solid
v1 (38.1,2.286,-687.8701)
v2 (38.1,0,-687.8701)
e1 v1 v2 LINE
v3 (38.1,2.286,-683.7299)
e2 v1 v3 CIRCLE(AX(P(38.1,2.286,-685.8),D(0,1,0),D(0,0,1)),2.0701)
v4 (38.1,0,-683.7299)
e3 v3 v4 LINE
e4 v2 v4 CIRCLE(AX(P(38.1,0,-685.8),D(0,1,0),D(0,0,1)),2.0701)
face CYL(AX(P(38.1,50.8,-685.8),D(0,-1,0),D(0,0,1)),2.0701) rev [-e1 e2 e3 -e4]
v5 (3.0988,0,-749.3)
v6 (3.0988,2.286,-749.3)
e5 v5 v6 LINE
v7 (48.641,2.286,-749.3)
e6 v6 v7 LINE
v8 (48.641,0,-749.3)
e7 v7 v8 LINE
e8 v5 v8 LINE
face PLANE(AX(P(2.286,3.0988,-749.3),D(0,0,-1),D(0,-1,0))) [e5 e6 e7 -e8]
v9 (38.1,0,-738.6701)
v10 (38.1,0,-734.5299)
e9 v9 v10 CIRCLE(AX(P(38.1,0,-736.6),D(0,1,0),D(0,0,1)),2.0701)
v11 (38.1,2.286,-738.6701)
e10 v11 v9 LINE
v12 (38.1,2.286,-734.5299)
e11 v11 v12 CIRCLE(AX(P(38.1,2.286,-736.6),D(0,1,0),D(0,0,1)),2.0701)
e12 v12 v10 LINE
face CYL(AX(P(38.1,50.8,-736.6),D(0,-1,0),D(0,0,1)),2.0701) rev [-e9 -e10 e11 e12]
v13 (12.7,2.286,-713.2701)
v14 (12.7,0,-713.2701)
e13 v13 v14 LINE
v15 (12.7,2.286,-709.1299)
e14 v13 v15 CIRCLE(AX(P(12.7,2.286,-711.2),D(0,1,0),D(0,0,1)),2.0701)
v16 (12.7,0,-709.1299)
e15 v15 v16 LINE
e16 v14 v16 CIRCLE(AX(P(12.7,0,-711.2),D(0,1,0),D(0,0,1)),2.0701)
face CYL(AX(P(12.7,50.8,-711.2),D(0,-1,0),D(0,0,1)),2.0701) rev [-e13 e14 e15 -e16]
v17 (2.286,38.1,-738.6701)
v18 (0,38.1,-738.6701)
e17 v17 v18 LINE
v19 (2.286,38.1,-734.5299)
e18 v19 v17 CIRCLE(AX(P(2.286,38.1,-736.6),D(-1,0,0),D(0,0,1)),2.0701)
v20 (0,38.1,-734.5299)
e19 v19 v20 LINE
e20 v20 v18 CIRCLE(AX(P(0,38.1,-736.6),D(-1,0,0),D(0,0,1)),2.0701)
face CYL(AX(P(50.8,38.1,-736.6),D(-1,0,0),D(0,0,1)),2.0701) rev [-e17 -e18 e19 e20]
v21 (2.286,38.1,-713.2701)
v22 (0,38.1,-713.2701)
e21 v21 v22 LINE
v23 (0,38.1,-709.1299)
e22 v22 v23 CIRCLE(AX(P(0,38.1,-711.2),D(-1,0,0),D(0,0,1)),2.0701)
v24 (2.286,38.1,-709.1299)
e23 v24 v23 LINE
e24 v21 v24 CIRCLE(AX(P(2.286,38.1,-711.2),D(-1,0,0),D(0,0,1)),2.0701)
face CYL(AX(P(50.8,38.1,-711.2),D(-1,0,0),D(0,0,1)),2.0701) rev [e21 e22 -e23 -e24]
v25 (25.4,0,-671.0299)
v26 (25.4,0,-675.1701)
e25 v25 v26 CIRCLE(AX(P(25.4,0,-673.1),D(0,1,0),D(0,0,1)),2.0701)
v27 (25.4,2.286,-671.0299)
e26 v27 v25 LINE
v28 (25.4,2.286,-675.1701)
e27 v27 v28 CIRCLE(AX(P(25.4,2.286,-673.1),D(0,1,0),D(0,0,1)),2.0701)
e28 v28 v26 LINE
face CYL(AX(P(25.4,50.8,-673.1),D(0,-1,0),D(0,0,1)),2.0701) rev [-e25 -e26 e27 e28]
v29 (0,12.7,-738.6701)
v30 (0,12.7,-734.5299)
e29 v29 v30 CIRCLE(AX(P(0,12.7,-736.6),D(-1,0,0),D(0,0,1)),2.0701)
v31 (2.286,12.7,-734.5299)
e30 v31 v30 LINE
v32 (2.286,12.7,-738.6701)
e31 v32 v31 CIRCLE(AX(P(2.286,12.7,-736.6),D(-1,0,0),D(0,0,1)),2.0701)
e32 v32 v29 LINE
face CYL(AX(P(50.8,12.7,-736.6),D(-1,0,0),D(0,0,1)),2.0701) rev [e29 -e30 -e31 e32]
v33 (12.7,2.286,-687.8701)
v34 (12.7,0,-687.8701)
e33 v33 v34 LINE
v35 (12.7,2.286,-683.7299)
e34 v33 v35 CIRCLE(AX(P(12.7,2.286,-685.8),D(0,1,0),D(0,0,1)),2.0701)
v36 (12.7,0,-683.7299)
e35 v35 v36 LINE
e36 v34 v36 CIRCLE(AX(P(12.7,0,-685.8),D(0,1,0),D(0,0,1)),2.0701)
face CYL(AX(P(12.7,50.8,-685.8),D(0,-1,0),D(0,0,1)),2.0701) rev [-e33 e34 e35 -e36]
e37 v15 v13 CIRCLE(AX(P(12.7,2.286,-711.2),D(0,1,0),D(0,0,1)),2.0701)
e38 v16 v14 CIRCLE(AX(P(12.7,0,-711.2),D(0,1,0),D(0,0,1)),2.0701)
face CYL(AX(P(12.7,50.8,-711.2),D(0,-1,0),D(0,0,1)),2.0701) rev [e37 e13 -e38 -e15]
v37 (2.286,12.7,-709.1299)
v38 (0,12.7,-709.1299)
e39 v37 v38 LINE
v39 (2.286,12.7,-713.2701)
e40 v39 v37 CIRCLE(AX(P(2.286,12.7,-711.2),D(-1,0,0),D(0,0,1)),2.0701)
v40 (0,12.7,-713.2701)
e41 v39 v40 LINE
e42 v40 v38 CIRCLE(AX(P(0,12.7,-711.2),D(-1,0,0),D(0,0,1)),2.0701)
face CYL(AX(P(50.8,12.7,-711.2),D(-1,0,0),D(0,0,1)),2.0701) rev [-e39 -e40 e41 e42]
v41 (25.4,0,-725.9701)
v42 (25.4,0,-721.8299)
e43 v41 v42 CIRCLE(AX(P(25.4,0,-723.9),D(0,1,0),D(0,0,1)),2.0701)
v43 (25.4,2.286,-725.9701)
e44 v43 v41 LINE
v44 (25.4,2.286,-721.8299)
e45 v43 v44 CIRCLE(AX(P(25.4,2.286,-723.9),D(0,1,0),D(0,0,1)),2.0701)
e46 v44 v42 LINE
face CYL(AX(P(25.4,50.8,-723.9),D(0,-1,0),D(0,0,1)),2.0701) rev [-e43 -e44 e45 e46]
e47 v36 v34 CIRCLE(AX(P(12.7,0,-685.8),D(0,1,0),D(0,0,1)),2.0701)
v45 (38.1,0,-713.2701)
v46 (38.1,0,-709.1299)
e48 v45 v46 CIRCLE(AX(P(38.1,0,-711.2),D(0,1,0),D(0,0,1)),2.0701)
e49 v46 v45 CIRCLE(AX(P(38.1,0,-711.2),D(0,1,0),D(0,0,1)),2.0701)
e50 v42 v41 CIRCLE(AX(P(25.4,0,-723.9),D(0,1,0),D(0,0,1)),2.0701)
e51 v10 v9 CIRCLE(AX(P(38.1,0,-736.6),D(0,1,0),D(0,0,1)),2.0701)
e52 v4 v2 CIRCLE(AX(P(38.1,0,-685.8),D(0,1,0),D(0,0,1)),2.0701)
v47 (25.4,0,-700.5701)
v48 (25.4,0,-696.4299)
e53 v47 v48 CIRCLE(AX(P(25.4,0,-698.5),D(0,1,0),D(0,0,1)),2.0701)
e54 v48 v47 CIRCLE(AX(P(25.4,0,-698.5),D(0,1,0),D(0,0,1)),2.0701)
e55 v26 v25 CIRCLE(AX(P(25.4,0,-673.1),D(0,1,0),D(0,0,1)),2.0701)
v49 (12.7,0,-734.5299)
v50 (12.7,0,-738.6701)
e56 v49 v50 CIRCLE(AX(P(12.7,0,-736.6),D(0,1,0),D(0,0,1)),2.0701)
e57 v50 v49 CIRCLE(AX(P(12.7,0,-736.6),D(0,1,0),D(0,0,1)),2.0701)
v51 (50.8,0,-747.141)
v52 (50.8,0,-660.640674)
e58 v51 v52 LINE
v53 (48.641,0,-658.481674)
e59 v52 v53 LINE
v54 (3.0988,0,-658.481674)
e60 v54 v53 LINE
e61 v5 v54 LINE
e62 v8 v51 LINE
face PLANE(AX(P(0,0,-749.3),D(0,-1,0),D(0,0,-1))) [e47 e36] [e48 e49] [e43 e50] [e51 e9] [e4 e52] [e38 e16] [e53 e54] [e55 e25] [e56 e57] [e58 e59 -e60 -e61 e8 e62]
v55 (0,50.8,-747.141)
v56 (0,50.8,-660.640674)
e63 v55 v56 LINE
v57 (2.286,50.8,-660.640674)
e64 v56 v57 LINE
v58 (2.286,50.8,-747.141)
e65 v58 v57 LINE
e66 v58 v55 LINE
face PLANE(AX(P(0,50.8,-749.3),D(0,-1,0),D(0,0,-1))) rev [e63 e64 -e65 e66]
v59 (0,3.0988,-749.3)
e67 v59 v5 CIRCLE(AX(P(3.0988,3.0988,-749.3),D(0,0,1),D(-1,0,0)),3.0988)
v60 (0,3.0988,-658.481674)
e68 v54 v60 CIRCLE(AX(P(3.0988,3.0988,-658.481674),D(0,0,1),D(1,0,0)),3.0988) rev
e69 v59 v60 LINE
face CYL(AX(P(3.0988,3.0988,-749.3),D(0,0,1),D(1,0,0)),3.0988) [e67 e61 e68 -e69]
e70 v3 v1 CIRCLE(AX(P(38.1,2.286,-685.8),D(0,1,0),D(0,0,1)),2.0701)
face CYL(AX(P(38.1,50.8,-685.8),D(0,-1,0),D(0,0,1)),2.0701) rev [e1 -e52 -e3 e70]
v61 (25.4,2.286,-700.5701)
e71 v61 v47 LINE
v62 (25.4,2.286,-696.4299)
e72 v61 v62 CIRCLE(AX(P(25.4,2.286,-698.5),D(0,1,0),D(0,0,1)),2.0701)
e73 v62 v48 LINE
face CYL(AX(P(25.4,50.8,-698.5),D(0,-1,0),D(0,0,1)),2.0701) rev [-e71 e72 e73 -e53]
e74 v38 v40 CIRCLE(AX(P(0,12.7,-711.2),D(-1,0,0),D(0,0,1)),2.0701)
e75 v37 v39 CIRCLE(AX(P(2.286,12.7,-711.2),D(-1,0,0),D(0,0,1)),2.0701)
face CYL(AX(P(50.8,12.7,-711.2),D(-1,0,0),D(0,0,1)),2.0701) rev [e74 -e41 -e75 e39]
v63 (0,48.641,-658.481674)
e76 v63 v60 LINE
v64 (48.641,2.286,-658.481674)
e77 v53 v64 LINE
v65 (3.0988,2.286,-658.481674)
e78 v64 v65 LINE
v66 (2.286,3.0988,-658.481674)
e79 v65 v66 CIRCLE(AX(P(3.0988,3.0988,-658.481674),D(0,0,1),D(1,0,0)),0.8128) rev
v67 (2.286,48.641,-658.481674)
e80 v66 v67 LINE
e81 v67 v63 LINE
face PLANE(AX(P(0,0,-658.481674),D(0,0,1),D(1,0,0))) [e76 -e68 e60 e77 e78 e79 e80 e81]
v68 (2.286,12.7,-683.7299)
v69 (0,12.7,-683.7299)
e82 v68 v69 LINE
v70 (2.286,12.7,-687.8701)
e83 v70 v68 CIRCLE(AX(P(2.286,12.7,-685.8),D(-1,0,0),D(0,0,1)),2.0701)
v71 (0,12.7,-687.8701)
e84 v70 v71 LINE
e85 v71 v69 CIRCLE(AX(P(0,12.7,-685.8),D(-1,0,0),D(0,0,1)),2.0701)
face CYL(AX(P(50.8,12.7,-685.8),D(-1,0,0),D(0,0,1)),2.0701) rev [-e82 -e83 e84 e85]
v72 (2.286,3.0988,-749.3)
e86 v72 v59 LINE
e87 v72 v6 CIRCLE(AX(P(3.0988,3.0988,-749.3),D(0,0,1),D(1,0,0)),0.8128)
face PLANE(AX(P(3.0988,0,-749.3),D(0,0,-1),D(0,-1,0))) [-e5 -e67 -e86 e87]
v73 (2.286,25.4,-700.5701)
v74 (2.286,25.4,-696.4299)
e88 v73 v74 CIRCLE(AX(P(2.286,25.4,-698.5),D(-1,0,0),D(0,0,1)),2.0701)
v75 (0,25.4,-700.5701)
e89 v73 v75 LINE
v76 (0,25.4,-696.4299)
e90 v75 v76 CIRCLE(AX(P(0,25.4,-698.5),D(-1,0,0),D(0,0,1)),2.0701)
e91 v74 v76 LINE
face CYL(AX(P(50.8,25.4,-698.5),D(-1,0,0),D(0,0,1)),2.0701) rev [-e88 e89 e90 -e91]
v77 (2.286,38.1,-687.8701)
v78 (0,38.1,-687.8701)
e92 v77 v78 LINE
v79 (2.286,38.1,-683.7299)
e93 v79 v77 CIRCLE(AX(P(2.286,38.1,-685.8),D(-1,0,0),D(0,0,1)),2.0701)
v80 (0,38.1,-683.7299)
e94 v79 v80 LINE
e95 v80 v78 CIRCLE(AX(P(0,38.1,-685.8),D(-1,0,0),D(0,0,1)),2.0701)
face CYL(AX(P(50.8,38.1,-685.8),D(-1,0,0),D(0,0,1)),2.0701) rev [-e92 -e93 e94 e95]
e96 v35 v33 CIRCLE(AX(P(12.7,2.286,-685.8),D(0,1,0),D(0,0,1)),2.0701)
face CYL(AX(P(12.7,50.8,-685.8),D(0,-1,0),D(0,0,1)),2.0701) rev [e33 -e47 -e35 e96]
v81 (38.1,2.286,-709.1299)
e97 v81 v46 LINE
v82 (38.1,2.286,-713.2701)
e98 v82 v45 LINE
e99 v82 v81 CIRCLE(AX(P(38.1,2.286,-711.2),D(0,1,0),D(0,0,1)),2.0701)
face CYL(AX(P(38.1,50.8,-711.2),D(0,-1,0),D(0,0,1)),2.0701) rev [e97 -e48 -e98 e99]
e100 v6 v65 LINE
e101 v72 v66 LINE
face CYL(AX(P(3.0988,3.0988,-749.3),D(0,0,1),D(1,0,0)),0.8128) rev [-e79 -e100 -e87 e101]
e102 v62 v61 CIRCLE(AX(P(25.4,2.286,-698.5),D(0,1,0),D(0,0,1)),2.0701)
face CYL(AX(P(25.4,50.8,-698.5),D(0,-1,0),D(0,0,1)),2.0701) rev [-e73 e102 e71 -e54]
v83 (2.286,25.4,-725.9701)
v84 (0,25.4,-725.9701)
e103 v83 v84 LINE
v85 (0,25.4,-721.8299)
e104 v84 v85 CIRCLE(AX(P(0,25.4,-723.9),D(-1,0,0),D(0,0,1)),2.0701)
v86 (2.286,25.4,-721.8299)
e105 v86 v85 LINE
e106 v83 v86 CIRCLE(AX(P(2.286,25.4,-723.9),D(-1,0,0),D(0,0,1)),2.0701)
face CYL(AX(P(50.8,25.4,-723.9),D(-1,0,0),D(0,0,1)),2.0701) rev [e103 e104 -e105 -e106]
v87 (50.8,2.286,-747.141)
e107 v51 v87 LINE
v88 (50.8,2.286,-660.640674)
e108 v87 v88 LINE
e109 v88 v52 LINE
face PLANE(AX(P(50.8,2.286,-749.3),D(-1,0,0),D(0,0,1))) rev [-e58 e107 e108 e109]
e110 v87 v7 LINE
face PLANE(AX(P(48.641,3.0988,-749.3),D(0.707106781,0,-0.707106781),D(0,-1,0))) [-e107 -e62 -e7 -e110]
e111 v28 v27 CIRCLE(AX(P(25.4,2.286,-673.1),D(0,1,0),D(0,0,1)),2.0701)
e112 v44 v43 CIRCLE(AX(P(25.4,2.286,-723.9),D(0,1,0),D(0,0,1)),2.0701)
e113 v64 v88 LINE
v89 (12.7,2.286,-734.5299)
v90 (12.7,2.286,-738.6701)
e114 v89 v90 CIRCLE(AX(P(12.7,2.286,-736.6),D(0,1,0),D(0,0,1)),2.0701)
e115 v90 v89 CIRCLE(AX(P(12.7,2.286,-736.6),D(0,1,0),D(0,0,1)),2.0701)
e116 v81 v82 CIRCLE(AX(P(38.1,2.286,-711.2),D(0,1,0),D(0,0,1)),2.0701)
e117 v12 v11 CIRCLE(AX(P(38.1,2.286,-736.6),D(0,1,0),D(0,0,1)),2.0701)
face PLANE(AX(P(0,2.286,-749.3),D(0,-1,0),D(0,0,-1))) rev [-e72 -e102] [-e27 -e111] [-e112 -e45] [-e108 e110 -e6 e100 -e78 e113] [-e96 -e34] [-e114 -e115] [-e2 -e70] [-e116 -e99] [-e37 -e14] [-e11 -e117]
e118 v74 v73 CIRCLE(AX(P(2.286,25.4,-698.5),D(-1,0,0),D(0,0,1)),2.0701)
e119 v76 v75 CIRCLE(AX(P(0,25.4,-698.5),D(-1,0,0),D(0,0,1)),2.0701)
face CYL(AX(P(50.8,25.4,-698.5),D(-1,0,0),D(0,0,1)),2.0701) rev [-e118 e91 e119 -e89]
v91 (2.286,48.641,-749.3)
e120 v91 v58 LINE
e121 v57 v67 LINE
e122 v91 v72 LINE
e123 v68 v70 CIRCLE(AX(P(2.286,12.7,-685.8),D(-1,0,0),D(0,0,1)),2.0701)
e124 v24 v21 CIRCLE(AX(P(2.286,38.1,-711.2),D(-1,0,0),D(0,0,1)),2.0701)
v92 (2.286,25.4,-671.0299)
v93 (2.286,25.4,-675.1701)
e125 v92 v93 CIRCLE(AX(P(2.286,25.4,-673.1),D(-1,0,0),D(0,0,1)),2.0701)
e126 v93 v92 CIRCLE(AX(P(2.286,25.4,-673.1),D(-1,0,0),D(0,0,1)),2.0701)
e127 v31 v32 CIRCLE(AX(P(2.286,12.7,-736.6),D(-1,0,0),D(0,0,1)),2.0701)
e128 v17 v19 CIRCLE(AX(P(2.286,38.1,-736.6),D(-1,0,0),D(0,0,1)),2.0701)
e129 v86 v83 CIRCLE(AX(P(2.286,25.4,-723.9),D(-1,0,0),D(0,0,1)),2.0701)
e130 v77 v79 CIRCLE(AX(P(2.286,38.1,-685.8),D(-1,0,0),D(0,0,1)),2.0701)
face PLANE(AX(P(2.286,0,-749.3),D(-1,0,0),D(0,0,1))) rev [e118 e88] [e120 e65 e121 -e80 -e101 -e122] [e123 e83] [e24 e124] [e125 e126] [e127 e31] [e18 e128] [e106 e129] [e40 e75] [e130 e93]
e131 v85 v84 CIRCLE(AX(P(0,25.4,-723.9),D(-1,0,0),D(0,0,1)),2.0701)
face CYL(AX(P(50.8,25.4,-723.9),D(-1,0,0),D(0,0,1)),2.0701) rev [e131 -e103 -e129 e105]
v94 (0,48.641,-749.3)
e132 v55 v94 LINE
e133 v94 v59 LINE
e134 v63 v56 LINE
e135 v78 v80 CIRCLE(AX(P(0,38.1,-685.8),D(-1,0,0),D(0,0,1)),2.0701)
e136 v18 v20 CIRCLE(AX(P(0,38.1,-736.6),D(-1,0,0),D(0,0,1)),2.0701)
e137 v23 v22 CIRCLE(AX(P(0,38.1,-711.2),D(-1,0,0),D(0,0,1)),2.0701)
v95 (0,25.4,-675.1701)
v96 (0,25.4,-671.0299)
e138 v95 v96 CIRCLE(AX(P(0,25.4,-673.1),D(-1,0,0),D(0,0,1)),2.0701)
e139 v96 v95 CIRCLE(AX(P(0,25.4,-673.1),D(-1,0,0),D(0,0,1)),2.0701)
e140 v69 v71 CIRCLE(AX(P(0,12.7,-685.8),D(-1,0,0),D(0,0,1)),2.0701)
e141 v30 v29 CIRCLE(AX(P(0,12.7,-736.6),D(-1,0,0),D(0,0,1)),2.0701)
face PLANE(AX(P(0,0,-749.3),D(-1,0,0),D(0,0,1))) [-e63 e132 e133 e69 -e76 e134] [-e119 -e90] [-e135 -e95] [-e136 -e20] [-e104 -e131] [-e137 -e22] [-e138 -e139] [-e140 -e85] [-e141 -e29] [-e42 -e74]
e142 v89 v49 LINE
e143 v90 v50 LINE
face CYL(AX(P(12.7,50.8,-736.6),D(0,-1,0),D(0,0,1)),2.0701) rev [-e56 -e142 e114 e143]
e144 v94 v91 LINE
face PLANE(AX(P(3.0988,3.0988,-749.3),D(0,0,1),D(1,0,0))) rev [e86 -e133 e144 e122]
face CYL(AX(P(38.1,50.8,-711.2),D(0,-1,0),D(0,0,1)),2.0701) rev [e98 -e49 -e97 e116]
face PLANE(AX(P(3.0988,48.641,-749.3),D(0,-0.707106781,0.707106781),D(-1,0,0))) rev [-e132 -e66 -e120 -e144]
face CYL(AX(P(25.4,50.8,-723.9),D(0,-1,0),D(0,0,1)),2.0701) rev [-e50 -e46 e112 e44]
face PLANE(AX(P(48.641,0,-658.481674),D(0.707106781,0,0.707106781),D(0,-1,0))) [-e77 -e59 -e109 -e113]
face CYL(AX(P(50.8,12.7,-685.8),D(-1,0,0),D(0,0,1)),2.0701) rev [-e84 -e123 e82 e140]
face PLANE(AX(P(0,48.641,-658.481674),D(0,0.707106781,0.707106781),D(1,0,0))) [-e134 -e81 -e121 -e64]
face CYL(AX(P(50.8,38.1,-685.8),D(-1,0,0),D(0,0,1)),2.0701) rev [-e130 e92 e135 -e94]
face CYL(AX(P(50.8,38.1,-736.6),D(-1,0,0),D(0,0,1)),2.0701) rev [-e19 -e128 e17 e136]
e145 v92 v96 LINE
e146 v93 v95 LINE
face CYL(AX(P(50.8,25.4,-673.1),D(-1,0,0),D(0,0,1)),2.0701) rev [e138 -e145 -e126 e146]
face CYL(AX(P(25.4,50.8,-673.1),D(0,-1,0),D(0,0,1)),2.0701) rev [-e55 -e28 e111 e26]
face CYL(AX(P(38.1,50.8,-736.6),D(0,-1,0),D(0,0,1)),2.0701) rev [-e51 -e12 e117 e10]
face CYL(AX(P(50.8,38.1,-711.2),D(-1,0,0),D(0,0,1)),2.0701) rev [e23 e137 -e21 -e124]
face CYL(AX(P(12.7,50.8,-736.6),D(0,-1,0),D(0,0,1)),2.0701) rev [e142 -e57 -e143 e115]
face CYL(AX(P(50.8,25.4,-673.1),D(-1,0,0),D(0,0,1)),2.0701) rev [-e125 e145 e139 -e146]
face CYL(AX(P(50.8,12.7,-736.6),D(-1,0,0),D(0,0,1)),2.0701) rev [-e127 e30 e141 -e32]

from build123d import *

# Parameters (mm, degrees)
CUT_EXTRUDE1_START       = 14.7701
CUT_EXTRUDE1_OUTLINE_W   = 2.286
CUT_EXTRUDE1_OUTLINE_H   = 127
CUT_EXTRUDE1_DEPTH       = 8.5598
CUT_EXTRUDE1_START_2     = 27.4701
CUT_EXTRUDE1_2_OUTLINE_W = 2.286
CUT_EXTRUDE1_2_OUTLINE_H = 127
CUT_EXTRUDE1_2_DEPTH     = 8.5598
CUT_EXTRUDE1_START_3     = 40.1701
CUT_EXTRUDE1_3_OUTLINE_W = 2.286
CUT_EXTRUDE1_3_OUTLINE_H = 127
CUT_EXTRUDE1_3_DEPTH     = 8.4709
CUT_EXTRUDE1_START_4     = 2.286
CUT_EXTRUDE1_4_OUTLINE_W = 2.286
CUT_EXTRUDE1_4_OUTLINE_H = 127
CUT_EXTRUDE1_4_DEPTH     = 8.3439
CUT_EXTRUDE1_5_OUTLINE_R = 2.0701
CUT_EXTRUDE1_5_DEPTH     = 3.0988
CUT_EXTRUDE1_START_5     = 10.6299
CUT_EXTRUDE1_6_OUTLINE_W = 2.286
CUT_EXTRUDE1_6_OUTLINE_H = 127
CUT_EXTRUDE1_6_DEPTH     = 40.1701
CUT_EXTRUDE1_START_6     = -1
CUT_EXTRUDE1_7_OUTLINE_R = 2.0701
CUT_EXTRUDE1_7_DEPTH     = 3.286
CUT_EXTRUDE1_START_7     = -749.3
CUT_EXTRUDE1_8_DEPTH     = 127
CUT_EXTRUDE1_START_8     = 564.229492087
CUT_EXTRUDE1_9_OUTLINE_W = 3.286
CUT_EXTRUDE1_9_OUTLINE_H = 75
CUT_EXTRUDE1_9_DEPTH     = 2.770507913
CHAMFER1_SIZE            = 2.159
BOSS_EXTRUDE1_START      = -2.286
BOSS_EXTRUDE1_DEPTH      = 2.286
BOSS_EXTRUDE2_START      = -2.286
BOSS_EXTRUDE2_DEPTH      = 2.286
SKETCH4_W                = 50.8
SKETCH4_H                = 50.8
CUT_EXTRUDE2_DEPTH       = 36.181674144
BOSS_EXTRUDE3_DEPTH      = 2.286
BOSS_EXTRUDE4_START      = -2.286
BOSS_EXTRUDE4_DEPTH      = 2.286
CHAMFER2_SIZE            = 2.159


with BuildPart() as part:
    # Cut-Extrude1: read off the stored shape, not the designer's step
    # Cut-Extrude1 outline → Cut-Extrude1 (new body)
    with BuildSketch(Plane(origin=(0, 0, 0), x_dir=(1, 0, 0), z_dir=(0, 1, 0)).offset(CUT_EXTRUDE1_START)):
        with Locations((1.143, 685.8)):
            Rectangle(CUT_EXTRUDE1_OUTLINE_W, CUT_EXTRUDE1_OUTLINE_H)
    extrude(amount=CUT_EXTRUDE1_DEPTH)



with BuildPart() as body_2:
    # Cut-Extrude1 2 outline → Cut-Extrude1 2 (new body)
    with BuildSketch(Plane(origin=(0, 0, 0), x_dir=(1, 0, 0), z_dir=(0, 1, 0)).offset(CUT_EXTRUDE1_START_2)):
        with Locations((1.143, 685.8)):
            Rectangle(CUT_EXTRUDE1_2_OUTLINE_W, CUT_EXTRUDE1_2_OUTLINE_H)
    extrude(amount=CUT_EXTRUDE1_2_DEPTH)


with BuildPart() as body_3:
    # Cut-Extrude1 3 outline → Cut-Extrude1 3 (new body)
    with BuildSketch(Plane(origin=(0, 0, 0), x_dir=(1, 0, 0), z_dir=(0, 1, 0)).offset(CUT_EXTRUDE1_START_3)):
        with Locations((1.143, 685.8)):
            Rectangle(CUT_EXTRUDE1_3_OUTLINE_W, CUT_EXTRUDE1_3_OUTLINE_H)
    extrude(amount=CUT_EXTRUDE1_3_DEPTH)


with BuildPart() as body_4:
    # Cut-Extrude1 4 outline → Cut-Extrude1 4 (new body)
    with BuildSketch(Plane(origin=(0, 0, 0), x_dir=(1, 0, 0), z_dir=(0, 1, 0)).offset(CUT_EXTRUDE1_START_4)):
        with Locations((1.143, 685.8)):
            Rectangle(CUT_EXTRUDE1_4_OUTLINE_W, CUT_EXTRUDE1_4_OUTLINE_H)
    extrude(amount=CUT_EXTRUDE1_4_DEPTH)

    # Cut-Extrude1 5 outline → Cut-Extrude1 5 (add)
    with BuildSketch(Plane(origin=(0, 0, 0), x_dir=(1, 0, 0), z_dir=(0, 1, 0))):
        with BuildLine():
            ThreePointArc((23.3299, 622.3), (23.936218252, 623.763781748), (25.4, 624.3701))
            ThreePointArc((25.4, 624.3701), (26.863781748, 623.763781748), (27.4701, 622.3))
            Line((27.4701, 622.3), (50.8, 622.3))
            Line((50.8, 622.3), (50.8, 747.141))
            Line((50.8, 747.141), (48.641, 749.3))
            Line((48.641, 749.3), (0, 749.3))
            Line((0, 749.3), (0, 622.3))
            Line((0, 622.3), (23.3299, 622.3))
        make_face()
        with Locations((12.7, 635)):
            Circle(CUT_EXTRUDE1_5_OUTLINE_R, mode=Mode.SUBTRACT)
        with Locations((25.4, 647.7)):
            Circle(CUT_EXTRUDE1_5_OUTLINE_R, mode=Mode.SUBTRACT)
        with Locations((12.7, 660.4)):
            Circle(CUT_EXTRUDE1_5_OUTLINE_R, mode=Mode.SUBTRACT)
        with Locations((25.4, 673.1)):
            Circle(CUT_EXTRUDE1_5_OUTLINE_R, mode=Mode.SUBTRACT)
        with Locations((38.1, 635)):
            Circle(CUT_EXTRUDE1_5_OUTLINE_R, mode=Mode.SUBTRACT)
        with Locations((38.1, 660.4)):
            Circle(CUT_EXTRUDE1_5_OUTLINE_R, mode=Mode.SUBTRACT)
        with Locations((12.7, 685.8)):
            Circle(CUT_EXTRUDE1_5_OUTLINE_R, mode=Mode.SUBTRACT)
        with Locations((12.7, 711.2)):
            Circle(CUT_EXTRUDE1_5_OUTLINE_R, mode=Mode.SUBTRACT)
        with Locations((25.4, 698.5)):
            Circle(CUT_EXTRUDE1_5_OUTLINE_R, mode=Mode.SUBTRACT)
        with Locations((12.7, 736.6)):
            Circle(CUT_EXTRUDE1_5_OUTLINE_R, mode=Mode.SUBTRACT)
        with Locations((25.4, 723.9)):
            Circle(CUT_EXTRUDE1_5_OUTLINE_R, mode=Mode.SUBTRACT)
        with Locations((38.1, 685.8)):
            Circle(CUT_EXTRUDE1_5_OUTLINE_R, mode=Mode.SUBTRACT)
        with Locations((38.1, 711.2)):
            Circle(CUT_EXTRUDE1_5_OUTLINE_R, mode=Mode.SUBTRACT)
        with Locations((38.1, 736.6)):
            Circle(CUT_EXTRUDE1_5_OUTLINE_R, mode=Mode.SUBTRACT)
    extrude(amount=CUT_EXTRUDE1_5_DEPTH)


with BuildPart() as part_1:
    add(part.part)

    add(body_2.part)  # Cut-Extrude1 6 merges body 2

    add(body_3.part)  # Cut-Extrude1 6 merges body 3

    add(body_4.part)  # Cut-Extrude1 6 merges body 4
    # Cut-Extrude1 6 outline → Cut-Extrude1 6 (add)
    with BuildSketch(Plane(origin=(0, 0, 0), x_dir=(1, 0, 0), z_dir=(0, 1, 0)).offset(CUT_EXTRUDE1_START_5)):
        with Locations((1.143, 685.8)):
            Rectangle(CUT_EXTRUDE1_6_OUTLINE_W, CUT_EXTRUDE1_6_OUTLINE_H)
    extrude(amount=CUT_EXTRUDE1_6_DEPTH)

    # Cut-Extrude1 7 outline → Cut-Extrude1 7 (cut)
    with BuildSketch(Plane.YZ.offset(CUT_EXTRUDE1_START_6)):
        with BuildLine():
            ThreePointArc((23.3299, -622.3), (23.936218252, -623.763781748), (25.4, -624.3701))
            ThreePointArc((25.4, -624.3701), (26.863781748, -623.763781748), (27.4701, -622.3))
            Line((27.4701, -622.3), (23.3299, -622.3))
        make_face()
        with Locations((25.4, -723.9)):
            Circle(CUT_EXTRUDE1_7_OUTLINE_R)
        with Locations((25.4, -698.5)):
            Circle(CUT_EXTRUDE1_7_OUTLINE_R)
        with Locations((25.4, -673.1)):
            Circle(CUT_EXTRUDE1_7_OUTLINE_R)
        with Locations((25.4, -647.7)):
            Circle(CUT_EXTRUDE1_7_OUTLINE_R)
        with Locations((12.7, -736.6)):
            Circle(CUT_EXTRUDE1_7_OUTLINE_R)
        with Locations((12.7, -711.2)):
            Circle(CUT_EXTRUDE1_7_OUTLINE_R)
        with Locations((12.7, -685.8)):
            Circle(CUT_EXTRUDE1_7_OUTLINE_R)
        with Locations((12.7, -660.4)):
            Circle(CUT_EXTRUDE1_7_OUTLINE_R)
        with Locations((12.7, -635)):
            Circle(CUT_EXTRUDE1_7_OUTLINE_R)
        with Locations((38.1, -736.6)):
            Circle(CUT_EXTRUDE1_7_OUTLINE_R)
        with Locations((38.1, -711.2)):
            Circle(CUT_EXTRUDE1_7_OUTLINE_R)
        with Locations((38.1, -685.8)):
            Circle(CUT_EXTRUDE1_7_OUTLINE_R)
        with Locations((38.1, -660.4)):
            Circle(CUT_EXTRUDE1_7_OUTLINE_R)
        with Locations((38.1, -635)):
            Circle(CUT_EXTRUDE1_7_OUTLINE_R)
    extrude(amount=CUT_EXTRUDE1_7_DEPTH, mode=Mode.SUBTRACT)

    # Cut-Extrude1 8 outline → Cut-Extrude1 8 (cut)
    with BuildSketch(Plane.XY.offset(CUT_EXTRUDE1_START_7)):
        with BuildLine():
            ThreePointArc((3.0988, 0), (0.907617506, 0.907617506), (0, 3.0988))
            Line((0, 3.0988), (2.4e-08, 50))
            Line((2.4e-08, 50), (-1, 50))
            Line((-1, 50), (-1, -1))
            Line((-1, -1), (50.8, -1))
            Line((50.8, -1), (50.8, 0))
            Line((50.8, 0), (3.0988, 0))
        make_face()
        with BuildLine():
            Line((3.0988, 2.286), (50.8, 2.286))
            Line((50.8, 2.286), (50.8, 3.0988))
            Line((50.8, 3.0988), (2.286, 3.0988))
            ThreePointArc((2.286, 3.0988), (2.524063608, 2.524063608), (3.0988, 2.286))
        make_face()
    extrude(amount=CUT_EXTRUDE1_8_DEPTH, mode=Mode.SUBTRACT)

    # Cut-Extrude1 9 outline → Cut-Extrude1 9 (cut)
    with BuildSketch(Plane(origin=(0, 0, 0), x_dir=(1, 0, 0), z_dir=(0, 0.7071067811865511, -0.7071067811865441)).offset(CUT_EXTRUDE1_START_8)):
        with Locations((0.643, 459.5)):
            Rectangle(CUT_EXTRUDE1_9_OUTLINE_W, CUT_EXTRUDE1_9_OUTLINE_H)
    extrude(amount=CUT_EXTRUDE1_9_DEPTH, mode=Mode.SUBTRACT)

    # Chamfer1
    chamfer1_edges = [part_1.edges().sort_by_distance(p)[0] for p in [
        (1.143, 50.8, -622.3),
        (50.8, 1.143, -622.3),
    ]]
    chamfer(chamfer1_edges, length=CHAMFER1_SIZE)

    # Sketch2 → Boss-Extrude1 (add)
    with BuildSketch(Plane(origin=(2.286, 0, 0), x_dir=(0, 0, -1), z_dir=(1, 0, 0)).offset(BOSS_EXTRUDE1_START)):
        with BuildLine():
            Line((622.3, 27.4701), (622.3, 23.3299))
            ThreePointArc((622.3, 23.3299), (624.3701, 25.4), (622.3, 27.4701))
        make_face()
    extrude(amount=BOSS_EXTRUDE1_DEPTH)

    # Sketch3 → Boss-Extrude2 (add)
    with BuildSketch(Plane(origin=(0, 2.286, 0), x_dir=(1, 0, 0), z_dir=(0, 1, 0)).offset(BOSS_EXTRUDE2_START)):
        with BuildLine():
            Line((23.3299, 622.3), (27.4701, 622.3))
            ThreePointArc((27.4701, 622.3), (25.4, 624.3701), (23.3299, 622.3))
        make_face()
    extrude(amount=BOSS_EXTRUDE2_DEPTH)

    # Sketch4 → Cut-Extrude2 (cut)
    with BuildSketch(Plane.XY.offset(-622.3)):
        with Locations((25.4, 25.4)):
            Rectangle(SKETCH4_W, SKETCH4_H)
    extrude(amount=-CUT_EXTRUDE2_DEPTH, mode=Mode.SUBTRACT)

    # Sketch5 → Boss-Extrude3 (add)
    with BuildSketch(Plane.XZ):
        with BuildLine():
            Line((38.878035938, -658.481674144), (37.321964062, -658.481674144))
            ThreePointArc((37.321964062, -658.481674144), (38.1, -662.4701), (38.878035938, -658.481674144))
        make_face()
        with BuildLine():
            Line((13.478035938, -658.481674144), (11.921964062, -658.481674144))
            ThreePointArc((11.921964062, -658.481674144), (12.7, -662.4701), (13.478035938, -658.481674144))
        make_face()
    extrude(amount=-BOSS_EXTRUDE3_DEPTH)

    # Sketch6 → Boss-Extrude4 (add)
    with BuildSketch(Plane(origin=(2.286, 0, 0), x_dir=(0, 0, -1), z_dir=(1, 0, 0)).offset(BOSS_EXTRUDE4_START)):
        with BuildLine():
            Line((658.481674144, 38.878035938), (658.481674144, 37.321964062))
            ThreePointArc((658.481674144, 37.321964062), (662.4701, 38.1), (658.481674144, 38.878035938))
        make_face()
        with BuildLine():
            Line((658.481674144, 11.921964062), (658.481674144, 13.478035938))
            ThreePointArc((658.481674144, 13.478035938), (662.4701, 12.7), (658.481674144, 11.921964062))
        make_face()
    extrude(amount=BOSS_EXTRUDE4_DEPTH)

    # Chamfer2
    chamfer2_edges = [part_1.edges().sort_by_distance(p)[0] for p in [
        (50.8, 1.143, -658.481674144),
        (1.143, 50.8, -658.481674144),
    ]]
    chamfer(chamfer2_edges, length=CHAMFER2_SIZE)


solid = part_1.part
